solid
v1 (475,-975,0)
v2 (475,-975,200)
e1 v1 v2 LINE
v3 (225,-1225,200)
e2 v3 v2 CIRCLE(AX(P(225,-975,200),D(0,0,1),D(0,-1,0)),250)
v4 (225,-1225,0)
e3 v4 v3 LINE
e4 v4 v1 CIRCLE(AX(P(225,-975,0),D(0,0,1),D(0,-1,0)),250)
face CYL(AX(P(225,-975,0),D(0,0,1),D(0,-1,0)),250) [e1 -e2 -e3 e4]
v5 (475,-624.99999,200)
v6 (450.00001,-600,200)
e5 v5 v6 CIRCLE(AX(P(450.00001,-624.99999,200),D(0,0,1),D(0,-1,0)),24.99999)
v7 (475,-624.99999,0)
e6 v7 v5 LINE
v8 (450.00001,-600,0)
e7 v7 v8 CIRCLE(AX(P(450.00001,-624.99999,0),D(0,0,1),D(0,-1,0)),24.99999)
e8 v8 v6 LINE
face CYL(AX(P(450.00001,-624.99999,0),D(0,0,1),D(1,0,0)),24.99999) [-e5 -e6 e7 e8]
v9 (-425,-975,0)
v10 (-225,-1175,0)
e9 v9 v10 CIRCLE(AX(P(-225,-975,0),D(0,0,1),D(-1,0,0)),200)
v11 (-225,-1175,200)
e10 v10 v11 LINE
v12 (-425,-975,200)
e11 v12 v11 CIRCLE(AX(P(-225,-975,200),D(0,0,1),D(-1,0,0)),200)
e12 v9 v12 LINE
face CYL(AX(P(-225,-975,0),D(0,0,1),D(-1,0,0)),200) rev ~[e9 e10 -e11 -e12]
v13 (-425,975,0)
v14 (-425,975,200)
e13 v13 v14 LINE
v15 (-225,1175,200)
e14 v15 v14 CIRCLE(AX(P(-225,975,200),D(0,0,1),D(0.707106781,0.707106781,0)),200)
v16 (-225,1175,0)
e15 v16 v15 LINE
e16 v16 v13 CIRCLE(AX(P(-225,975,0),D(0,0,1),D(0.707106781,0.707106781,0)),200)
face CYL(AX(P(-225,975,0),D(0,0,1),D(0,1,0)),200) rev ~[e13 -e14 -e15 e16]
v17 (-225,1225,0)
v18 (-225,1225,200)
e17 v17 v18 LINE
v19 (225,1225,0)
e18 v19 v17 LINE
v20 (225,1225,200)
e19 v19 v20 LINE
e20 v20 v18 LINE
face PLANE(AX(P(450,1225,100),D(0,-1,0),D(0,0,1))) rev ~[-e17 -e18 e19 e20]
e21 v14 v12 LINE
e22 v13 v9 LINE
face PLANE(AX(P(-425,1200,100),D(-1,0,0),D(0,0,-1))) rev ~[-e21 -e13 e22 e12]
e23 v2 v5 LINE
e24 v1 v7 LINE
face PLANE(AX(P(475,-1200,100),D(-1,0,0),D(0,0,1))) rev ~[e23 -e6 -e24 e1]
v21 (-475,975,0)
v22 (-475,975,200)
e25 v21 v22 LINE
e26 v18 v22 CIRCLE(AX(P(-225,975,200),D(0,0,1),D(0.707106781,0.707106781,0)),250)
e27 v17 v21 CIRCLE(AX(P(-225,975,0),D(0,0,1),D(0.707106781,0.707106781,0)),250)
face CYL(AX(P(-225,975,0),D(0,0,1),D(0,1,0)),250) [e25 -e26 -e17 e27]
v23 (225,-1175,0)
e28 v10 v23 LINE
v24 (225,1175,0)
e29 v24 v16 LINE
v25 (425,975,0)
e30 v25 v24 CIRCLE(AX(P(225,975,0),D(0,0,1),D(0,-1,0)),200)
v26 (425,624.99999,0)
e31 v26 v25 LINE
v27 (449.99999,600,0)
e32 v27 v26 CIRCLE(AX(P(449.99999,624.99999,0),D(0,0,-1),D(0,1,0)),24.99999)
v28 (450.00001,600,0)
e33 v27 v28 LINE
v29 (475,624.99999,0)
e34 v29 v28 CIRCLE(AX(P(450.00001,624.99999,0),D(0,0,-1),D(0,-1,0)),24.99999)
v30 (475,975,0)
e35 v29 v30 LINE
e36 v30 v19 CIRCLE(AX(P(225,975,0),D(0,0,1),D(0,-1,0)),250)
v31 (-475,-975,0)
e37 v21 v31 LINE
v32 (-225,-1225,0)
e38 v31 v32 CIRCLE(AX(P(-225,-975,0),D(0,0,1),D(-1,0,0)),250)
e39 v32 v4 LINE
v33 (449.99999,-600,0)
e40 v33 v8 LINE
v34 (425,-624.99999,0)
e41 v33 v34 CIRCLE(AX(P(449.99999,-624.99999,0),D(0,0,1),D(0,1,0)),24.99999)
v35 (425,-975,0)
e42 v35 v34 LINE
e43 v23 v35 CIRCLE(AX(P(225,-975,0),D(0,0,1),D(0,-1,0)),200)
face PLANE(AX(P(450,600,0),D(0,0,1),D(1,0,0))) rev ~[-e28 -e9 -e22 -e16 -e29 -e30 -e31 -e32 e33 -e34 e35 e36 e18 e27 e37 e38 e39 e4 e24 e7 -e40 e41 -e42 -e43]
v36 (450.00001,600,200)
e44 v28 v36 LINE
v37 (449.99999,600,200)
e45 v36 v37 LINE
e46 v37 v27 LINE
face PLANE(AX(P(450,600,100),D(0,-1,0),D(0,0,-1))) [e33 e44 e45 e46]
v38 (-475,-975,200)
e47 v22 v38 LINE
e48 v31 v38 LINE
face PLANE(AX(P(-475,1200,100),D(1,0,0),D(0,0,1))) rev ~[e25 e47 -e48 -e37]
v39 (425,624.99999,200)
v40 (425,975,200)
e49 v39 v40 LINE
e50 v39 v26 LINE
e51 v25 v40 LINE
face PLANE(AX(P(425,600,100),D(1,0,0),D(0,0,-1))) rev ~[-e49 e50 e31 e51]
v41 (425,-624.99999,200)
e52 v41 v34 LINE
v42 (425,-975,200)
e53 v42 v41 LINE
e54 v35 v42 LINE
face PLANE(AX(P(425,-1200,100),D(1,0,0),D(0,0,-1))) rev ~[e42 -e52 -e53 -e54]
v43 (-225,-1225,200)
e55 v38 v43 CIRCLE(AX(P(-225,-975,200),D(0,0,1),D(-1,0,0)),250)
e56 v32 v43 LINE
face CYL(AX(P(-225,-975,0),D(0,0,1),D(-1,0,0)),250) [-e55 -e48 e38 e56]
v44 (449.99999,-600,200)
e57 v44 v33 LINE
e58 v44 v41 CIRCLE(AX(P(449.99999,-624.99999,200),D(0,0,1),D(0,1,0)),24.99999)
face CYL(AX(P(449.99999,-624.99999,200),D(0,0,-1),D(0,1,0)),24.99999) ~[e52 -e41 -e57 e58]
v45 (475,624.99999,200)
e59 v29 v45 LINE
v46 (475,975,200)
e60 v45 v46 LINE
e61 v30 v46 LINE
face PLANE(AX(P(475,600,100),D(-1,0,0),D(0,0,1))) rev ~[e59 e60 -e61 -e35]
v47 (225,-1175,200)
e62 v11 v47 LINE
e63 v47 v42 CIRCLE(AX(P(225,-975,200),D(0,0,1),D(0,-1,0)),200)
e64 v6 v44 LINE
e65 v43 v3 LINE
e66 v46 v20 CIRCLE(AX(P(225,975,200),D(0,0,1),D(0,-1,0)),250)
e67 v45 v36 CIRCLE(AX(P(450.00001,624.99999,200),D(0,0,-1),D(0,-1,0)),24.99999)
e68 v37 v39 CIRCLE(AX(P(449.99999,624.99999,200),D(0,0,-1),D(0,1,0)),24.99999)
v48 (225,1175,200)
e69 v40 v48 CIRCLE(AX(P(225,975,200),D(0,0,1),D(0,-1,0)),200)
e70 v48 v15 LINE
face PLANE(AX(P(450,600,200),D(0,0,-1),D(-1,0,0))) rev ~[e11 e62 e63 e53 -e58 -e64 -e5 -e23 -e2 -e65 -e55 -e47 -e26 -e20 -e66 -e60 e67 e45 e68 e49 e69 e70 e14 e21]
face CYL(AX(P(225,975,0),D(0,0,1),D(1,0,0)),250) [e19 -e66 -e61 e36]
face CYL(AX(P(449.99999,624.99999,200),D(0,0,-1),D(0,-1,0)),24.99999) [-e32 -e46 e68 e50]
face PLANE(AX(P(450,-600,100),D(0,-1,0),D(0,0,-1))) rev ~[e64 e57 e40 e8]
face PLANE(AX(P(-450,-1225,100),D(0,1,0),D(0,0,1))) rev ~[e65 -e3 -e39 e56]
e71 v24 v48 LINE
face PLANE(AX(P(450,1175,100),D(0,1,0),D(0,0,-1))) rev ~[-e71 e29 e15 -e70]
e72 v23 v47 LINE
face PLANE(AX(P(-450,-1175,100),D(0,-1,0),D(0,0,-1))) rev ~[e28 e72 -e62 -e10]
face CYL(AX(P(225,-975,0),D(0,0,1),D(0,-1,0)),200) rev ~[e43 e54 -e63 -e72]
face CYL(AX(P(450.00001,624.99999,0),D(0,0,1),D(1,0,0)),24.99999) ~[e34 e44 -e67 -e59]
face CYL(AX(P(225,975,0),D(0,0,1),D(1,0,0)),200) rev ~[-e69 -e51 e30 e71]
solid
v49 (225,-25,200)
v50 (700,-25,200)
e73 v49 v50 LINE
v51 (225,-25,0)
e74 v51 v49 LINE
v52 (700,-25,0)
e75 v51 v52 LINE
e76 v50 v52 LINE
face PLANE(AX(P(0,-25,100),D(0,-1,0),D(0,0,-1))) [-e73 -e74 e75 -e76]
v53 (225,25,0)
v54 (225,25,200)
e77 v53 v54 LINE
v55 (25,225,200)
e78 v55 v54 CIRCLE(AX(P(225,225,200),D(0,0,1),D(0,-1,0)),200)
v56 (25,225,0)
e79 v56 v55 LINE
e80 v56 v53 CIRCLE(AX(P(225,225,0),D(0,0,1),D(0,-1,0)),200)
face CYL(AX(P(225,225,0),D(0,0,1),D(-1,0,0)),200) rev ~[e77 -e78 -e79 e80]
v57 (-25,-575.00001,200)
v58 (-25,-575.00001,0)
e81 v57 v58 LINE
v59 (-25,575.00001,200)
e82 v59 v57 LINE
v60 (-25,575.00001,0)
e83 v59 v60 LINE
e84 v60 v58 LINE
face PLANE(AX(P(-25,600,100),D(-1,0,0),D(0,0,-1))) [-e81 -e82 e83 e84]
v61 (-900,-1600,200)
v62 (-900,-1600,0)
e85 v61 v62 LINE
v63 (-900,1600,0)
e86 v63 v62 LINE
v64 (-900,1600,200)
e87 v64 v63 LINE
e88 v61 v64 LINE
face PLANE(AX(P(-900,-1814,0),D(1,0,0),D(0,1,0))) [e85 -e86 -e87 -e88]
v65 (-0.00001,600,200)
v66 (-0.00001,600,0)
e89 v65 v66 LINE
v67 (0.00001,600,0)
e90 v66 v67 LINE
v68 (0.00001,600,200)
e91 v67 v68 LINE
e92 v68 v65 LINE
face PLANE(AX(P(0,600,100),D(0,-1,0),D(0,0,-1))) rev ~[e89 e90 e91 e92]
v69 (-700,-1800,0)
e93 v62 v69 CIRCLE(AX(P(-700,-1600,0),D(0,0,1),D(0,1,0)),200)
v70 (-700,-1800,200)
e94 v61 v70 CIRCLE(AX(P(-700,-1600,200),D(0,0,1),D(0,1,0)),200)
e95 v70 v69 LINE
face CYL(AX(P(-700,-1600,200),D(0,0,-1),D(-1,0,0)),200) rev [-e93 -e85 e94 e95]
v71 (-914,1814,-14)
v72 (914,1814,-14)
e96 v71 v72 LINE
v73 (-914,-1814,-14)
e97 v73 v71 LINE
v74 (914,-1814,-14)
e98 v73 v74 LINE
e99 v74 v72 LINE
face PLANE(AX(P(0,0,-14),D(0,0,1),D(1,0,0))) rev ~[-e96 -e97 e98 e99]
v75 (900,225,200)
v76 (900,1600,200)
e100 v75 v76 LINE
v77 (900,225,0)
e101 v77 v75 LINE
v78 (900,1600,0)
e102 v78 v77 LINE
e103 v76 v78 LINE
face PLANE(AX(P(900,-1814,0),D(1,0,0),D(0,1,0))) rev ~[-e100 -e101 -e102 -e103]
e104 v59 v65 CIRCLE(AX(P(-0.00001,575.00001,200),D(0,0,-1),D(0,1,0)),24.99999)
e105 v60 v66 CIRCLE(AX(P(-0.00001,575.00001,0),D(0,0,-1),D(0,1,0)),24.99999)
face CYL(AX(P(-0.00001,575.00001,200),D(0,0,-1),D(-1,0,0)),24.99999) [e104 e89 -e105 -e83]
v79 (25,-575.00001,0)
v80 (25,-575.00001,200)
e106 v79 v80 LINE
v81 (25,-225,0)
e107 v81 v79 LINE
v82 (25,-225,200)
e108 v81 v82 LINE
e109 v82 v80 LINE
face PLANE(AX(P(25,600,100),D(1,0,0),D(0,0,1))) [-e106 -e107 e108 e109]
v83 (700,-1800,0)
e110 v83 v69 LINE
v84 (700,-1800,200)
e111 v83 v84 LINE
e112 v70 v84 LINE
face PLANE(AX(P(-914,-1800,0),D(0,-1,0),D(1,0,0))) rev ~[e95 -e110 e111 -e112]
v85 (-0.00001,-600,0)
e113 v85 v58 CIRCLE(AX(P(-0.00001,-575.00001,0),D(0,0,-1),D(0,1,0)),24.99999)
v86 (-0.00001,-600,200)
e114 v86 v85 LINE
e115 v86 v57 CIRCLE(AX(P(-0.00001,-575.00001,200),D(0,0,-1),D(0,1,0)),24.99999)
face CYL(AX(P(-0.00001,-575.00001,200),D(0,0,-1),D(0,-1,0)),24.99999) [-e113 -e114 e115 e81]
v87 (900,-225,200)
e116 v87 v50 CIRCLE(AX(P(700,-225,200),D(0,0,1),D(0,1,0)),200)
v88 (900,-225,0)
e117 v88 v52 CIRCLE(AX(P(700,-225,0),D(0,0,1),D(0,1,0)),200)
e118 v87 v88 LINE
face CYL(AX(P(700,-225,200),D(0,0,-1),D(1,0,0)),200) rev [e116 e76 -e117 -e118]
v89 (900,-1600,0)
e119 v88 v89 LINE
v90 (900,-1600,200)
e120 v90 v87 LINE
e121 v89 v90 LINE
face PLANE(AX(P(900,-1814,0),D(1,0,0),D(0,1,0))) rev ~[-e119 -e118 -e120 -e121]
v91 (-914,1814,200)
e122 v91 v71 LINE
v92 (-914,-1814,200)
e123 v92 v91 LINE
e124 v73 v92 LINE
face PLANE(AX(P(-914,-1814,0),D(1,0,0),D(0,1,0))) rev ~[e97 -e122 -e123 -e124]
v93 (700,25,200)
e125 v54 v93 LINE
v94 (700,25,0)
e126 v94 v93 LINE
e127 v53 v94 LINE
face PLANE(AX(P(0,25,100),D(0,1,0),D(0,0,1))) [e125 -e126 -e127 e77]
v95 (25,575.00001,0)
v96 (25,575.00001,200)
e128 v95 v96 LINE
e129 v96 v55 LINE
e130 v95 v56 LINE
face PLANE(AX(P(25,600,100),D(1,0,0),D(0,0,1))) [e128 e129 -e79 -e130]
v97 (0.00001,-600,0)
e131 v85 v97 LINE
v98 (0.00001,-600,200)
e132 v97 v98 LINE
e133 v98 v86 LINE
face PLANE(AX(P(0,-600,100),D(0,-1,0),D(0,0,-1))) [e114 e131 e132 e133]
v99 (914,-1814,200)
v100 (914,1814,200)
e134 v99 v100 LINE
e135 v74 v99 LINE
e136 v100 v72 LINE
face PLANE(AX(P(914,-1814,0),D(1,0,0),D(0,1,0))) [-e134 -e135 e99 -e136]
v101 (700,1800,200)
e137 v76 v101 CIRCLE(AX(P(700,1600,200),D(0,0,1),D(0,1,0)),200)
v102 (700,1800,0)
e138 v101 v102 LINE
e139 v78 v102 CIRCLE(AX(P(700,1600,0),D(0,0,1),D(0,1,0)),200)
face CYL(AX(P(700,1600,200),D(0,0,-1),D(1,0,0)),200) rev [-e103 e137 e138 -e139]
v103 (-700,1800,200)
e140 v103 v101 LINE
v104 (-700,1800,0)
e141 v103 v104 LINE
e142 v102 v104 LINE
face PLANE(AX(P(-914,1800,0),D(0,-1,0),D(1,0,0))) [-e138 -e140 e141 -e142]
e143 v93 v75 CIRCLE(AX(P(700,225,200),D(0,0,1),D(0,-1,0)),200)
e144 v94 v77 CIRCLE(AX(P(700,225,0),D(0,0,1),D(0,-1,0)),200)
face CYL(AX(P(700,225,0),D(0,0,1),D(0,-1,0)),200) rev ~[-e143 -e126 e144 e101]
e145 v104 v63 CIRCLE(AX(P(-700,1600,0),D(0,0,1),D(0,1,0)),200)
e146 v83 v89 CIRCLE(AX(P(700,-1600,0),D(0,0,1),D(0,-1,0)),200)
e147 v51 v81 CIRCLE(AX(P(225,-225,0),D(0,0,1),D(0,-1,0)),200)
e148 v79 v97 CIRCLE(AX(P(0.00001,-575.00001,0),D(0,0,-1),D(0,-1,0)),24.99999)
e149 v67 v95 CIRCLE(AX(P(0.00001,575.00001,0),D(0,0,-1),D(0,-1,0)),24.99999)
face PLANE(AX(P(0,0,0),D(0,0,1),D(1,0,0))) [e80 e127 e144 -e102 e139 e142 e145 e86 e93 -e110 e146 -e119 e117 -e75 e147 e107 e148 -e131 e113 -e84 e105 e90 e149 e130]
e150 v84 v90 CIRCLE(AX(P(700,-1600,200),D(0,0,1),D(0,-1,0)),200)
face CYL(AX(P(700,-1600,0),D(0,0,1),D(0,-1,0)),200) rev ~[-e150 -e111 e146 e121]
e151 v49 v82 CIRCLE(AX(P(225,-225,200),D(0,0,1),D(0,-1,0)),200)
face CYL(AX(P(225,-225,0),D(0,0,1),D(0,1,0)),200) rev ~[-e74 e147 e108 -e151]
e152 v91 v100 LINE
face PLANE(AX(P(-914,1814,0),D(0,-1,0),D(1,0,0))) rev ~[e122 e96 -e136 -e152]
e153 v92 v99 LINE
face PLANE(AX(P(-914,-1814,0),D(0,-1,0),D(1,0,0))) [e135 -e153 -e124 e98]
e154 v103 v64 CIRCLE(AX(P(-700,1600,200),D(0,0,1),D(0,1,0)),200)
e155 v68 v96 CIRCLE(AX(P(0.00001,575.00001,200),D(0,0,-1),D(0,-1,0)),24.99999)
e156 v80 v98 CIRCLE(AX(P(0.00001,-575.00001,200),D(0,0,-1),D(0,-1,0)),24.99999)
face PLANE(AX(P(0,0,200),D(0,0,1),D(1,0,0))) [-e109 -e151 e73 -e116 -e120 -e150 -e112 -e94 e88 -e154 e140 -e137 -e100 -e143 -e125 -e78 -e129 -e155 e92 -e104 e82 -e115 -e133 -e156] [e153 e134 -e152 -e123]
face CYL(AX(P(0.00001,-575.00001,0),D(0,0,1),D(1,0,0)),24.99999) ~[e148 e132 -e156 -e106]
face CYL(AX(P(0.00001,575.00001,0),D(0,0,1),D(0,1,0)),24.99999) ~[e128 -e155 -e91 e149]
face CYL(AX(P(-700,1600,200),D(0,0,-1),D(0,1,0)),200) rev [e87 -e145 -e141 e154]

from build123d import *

# Parameters (mm, degrees)
F6_W          = 1828
F6_H          = 3628
F7_DEPTH      = 200
F7_DEPTH_BACK = 14
F8_T          = -14
F11_W         = 50
F11_H         = 200
F16_R         = 200
F16_2_R       = 200
F17_R         = 250
F18_R         = 24.99999
F18_2_R       = 24.99999


# Not quite as in the source:
# - a fillet or chamfer is up to 0.001 mm smaller than in the source, because OpenCascade refuses the exact size


with BuildPart() as f7:
    # F6 (on Top) → F7 (new body, two sides)
    with BuildSketch(Plane.XY) as f7_sk:
        Rectangle(F6_W, F6_H)
    extrude(amount=F7_DEPTH)
    extrude(f7_sk.sketch, amount=-F7_DEPTH_BACK)

    # F8
    f8_openings = [f7.faces().sort_by_distance(p)[0] for p in [
        (0, 0, 200),
    ]]
    offset(amount=F8_T, openings=f8_openings)


with BuildPart() as f12:
    # F12: sweep along a path in F9
    with BuildLine(Plane.XY) as f12_path:
        Line((450, 600), (450, 1200))
        Line((450, 1200), (-450, 1200))
        Line((-450, 1200), (-450, 0))
        Line((-450, 0), (-450, -1200))
        Line((-450, -1200), (450, -1200))
        Line((450, -1200), (450, -600))
    # F11 (on plane+point) → F12 (sweep)
    with BuildSketch(Plane.XZ.offset(-600)):
        with Locations((450, 100)):
            Rectangle(F11_W, F11_H)
    sweep(path=f12_path.line, transition=Transition.RIGHT)

    # F16
    f16_edges = [f12.edges().sort_by_distance(p)[0] for p in [
        (-425, 1175, 100),
        (425, 1175, 100),
        (-425, -1175, 100),
        (425, -1175, 100),
    ]]
    fillet(f16_edges, radius=F16_R)

    # F17
    f17_edges = [f12.edges().sort_by_distance(p)[0] for p in [
        (-475, 1225, 100),
        (475, 1225, 100),
        (-475, -1225, 100),
        (475, -1225, 100),
    ]]
    fillet(f17_edges, radius=F17_R)

    # F18 (radius 25 in the source; OpenCascade refuses exactly that, so slightly less here)
    f18_edges = [f12.edges().sort_by_distance(p)[0] for p in [
        (425, 600, 100),
        (475, 600, 100),
        (425, -600, 100),
        (475, -600, 100),
    ]]
    fillet(f18_edges, radius=F18_R)


with BuildPart() as f13:
    # F13: sweep along a path in F9
    with BuildLine(Plane.XY) as f13_path:
        Line((0, 600), (0, 0))
        Line((0, 0), (900, 0))
    # F11 (on plane+point) → F13 (sweep)
    with BuildSketch(Plane.XZ.offset(-600)):
        with Locations((0, 100)):
            Rectangle(F11_W, F11_H)
    sweep(path=f13_path.line, transition=Transition.RIGHT)


with BuildPart() as f14:
    # F14: sweep along a path in F9
    with BuildLine(Plane.XY) as f14_path:
        Line((0, 600), (0, 0))
        Line((0, 0), (0, -600))
    # F11 (on plane+point) → F14 (sweep)
    with BuildSketch(Plane.XZ.offset(-600)):
        with Locations((0, 100)):
            Rectangle(F11_W, F11_H)
    sweep(path=f14_path.line)


with BuildPart() as f7_1:
    add(f7.part)

    # F15: union F13, F14
    add(f13.part)
    add(f14.part)

    # F16#2
    f16_2_edges = [f7_1.edges().sort_by_distance(p)[0] for p in [
        (25, 25, 100),
        (25, -25, 100),
        (900, -1800, 100),
        (-900, -1800, 100),
        (-900, 1800, 100),
        (900, 1800, 100),
        (900, -25, 100),
        (900, 25, 100),
    ]]
    fillet(f16_2_edges, radius=F16_2_R)

    # F18#2 (radius 25 in the source; OpenCascade refuses exactly that, so slightly less here)
    f18_2_edges = [f7_1.edges().sort_by_distance(p)[0] for p in [
        (-25, 600, 100),
        (25, 600, 100),
        (-25, -600, 100),
        (25, -600, 100),
    ]]
    fillet(f18_2_edges, radius=F18_2_R)


solid = Compound([f12.part, f7_1.part])
